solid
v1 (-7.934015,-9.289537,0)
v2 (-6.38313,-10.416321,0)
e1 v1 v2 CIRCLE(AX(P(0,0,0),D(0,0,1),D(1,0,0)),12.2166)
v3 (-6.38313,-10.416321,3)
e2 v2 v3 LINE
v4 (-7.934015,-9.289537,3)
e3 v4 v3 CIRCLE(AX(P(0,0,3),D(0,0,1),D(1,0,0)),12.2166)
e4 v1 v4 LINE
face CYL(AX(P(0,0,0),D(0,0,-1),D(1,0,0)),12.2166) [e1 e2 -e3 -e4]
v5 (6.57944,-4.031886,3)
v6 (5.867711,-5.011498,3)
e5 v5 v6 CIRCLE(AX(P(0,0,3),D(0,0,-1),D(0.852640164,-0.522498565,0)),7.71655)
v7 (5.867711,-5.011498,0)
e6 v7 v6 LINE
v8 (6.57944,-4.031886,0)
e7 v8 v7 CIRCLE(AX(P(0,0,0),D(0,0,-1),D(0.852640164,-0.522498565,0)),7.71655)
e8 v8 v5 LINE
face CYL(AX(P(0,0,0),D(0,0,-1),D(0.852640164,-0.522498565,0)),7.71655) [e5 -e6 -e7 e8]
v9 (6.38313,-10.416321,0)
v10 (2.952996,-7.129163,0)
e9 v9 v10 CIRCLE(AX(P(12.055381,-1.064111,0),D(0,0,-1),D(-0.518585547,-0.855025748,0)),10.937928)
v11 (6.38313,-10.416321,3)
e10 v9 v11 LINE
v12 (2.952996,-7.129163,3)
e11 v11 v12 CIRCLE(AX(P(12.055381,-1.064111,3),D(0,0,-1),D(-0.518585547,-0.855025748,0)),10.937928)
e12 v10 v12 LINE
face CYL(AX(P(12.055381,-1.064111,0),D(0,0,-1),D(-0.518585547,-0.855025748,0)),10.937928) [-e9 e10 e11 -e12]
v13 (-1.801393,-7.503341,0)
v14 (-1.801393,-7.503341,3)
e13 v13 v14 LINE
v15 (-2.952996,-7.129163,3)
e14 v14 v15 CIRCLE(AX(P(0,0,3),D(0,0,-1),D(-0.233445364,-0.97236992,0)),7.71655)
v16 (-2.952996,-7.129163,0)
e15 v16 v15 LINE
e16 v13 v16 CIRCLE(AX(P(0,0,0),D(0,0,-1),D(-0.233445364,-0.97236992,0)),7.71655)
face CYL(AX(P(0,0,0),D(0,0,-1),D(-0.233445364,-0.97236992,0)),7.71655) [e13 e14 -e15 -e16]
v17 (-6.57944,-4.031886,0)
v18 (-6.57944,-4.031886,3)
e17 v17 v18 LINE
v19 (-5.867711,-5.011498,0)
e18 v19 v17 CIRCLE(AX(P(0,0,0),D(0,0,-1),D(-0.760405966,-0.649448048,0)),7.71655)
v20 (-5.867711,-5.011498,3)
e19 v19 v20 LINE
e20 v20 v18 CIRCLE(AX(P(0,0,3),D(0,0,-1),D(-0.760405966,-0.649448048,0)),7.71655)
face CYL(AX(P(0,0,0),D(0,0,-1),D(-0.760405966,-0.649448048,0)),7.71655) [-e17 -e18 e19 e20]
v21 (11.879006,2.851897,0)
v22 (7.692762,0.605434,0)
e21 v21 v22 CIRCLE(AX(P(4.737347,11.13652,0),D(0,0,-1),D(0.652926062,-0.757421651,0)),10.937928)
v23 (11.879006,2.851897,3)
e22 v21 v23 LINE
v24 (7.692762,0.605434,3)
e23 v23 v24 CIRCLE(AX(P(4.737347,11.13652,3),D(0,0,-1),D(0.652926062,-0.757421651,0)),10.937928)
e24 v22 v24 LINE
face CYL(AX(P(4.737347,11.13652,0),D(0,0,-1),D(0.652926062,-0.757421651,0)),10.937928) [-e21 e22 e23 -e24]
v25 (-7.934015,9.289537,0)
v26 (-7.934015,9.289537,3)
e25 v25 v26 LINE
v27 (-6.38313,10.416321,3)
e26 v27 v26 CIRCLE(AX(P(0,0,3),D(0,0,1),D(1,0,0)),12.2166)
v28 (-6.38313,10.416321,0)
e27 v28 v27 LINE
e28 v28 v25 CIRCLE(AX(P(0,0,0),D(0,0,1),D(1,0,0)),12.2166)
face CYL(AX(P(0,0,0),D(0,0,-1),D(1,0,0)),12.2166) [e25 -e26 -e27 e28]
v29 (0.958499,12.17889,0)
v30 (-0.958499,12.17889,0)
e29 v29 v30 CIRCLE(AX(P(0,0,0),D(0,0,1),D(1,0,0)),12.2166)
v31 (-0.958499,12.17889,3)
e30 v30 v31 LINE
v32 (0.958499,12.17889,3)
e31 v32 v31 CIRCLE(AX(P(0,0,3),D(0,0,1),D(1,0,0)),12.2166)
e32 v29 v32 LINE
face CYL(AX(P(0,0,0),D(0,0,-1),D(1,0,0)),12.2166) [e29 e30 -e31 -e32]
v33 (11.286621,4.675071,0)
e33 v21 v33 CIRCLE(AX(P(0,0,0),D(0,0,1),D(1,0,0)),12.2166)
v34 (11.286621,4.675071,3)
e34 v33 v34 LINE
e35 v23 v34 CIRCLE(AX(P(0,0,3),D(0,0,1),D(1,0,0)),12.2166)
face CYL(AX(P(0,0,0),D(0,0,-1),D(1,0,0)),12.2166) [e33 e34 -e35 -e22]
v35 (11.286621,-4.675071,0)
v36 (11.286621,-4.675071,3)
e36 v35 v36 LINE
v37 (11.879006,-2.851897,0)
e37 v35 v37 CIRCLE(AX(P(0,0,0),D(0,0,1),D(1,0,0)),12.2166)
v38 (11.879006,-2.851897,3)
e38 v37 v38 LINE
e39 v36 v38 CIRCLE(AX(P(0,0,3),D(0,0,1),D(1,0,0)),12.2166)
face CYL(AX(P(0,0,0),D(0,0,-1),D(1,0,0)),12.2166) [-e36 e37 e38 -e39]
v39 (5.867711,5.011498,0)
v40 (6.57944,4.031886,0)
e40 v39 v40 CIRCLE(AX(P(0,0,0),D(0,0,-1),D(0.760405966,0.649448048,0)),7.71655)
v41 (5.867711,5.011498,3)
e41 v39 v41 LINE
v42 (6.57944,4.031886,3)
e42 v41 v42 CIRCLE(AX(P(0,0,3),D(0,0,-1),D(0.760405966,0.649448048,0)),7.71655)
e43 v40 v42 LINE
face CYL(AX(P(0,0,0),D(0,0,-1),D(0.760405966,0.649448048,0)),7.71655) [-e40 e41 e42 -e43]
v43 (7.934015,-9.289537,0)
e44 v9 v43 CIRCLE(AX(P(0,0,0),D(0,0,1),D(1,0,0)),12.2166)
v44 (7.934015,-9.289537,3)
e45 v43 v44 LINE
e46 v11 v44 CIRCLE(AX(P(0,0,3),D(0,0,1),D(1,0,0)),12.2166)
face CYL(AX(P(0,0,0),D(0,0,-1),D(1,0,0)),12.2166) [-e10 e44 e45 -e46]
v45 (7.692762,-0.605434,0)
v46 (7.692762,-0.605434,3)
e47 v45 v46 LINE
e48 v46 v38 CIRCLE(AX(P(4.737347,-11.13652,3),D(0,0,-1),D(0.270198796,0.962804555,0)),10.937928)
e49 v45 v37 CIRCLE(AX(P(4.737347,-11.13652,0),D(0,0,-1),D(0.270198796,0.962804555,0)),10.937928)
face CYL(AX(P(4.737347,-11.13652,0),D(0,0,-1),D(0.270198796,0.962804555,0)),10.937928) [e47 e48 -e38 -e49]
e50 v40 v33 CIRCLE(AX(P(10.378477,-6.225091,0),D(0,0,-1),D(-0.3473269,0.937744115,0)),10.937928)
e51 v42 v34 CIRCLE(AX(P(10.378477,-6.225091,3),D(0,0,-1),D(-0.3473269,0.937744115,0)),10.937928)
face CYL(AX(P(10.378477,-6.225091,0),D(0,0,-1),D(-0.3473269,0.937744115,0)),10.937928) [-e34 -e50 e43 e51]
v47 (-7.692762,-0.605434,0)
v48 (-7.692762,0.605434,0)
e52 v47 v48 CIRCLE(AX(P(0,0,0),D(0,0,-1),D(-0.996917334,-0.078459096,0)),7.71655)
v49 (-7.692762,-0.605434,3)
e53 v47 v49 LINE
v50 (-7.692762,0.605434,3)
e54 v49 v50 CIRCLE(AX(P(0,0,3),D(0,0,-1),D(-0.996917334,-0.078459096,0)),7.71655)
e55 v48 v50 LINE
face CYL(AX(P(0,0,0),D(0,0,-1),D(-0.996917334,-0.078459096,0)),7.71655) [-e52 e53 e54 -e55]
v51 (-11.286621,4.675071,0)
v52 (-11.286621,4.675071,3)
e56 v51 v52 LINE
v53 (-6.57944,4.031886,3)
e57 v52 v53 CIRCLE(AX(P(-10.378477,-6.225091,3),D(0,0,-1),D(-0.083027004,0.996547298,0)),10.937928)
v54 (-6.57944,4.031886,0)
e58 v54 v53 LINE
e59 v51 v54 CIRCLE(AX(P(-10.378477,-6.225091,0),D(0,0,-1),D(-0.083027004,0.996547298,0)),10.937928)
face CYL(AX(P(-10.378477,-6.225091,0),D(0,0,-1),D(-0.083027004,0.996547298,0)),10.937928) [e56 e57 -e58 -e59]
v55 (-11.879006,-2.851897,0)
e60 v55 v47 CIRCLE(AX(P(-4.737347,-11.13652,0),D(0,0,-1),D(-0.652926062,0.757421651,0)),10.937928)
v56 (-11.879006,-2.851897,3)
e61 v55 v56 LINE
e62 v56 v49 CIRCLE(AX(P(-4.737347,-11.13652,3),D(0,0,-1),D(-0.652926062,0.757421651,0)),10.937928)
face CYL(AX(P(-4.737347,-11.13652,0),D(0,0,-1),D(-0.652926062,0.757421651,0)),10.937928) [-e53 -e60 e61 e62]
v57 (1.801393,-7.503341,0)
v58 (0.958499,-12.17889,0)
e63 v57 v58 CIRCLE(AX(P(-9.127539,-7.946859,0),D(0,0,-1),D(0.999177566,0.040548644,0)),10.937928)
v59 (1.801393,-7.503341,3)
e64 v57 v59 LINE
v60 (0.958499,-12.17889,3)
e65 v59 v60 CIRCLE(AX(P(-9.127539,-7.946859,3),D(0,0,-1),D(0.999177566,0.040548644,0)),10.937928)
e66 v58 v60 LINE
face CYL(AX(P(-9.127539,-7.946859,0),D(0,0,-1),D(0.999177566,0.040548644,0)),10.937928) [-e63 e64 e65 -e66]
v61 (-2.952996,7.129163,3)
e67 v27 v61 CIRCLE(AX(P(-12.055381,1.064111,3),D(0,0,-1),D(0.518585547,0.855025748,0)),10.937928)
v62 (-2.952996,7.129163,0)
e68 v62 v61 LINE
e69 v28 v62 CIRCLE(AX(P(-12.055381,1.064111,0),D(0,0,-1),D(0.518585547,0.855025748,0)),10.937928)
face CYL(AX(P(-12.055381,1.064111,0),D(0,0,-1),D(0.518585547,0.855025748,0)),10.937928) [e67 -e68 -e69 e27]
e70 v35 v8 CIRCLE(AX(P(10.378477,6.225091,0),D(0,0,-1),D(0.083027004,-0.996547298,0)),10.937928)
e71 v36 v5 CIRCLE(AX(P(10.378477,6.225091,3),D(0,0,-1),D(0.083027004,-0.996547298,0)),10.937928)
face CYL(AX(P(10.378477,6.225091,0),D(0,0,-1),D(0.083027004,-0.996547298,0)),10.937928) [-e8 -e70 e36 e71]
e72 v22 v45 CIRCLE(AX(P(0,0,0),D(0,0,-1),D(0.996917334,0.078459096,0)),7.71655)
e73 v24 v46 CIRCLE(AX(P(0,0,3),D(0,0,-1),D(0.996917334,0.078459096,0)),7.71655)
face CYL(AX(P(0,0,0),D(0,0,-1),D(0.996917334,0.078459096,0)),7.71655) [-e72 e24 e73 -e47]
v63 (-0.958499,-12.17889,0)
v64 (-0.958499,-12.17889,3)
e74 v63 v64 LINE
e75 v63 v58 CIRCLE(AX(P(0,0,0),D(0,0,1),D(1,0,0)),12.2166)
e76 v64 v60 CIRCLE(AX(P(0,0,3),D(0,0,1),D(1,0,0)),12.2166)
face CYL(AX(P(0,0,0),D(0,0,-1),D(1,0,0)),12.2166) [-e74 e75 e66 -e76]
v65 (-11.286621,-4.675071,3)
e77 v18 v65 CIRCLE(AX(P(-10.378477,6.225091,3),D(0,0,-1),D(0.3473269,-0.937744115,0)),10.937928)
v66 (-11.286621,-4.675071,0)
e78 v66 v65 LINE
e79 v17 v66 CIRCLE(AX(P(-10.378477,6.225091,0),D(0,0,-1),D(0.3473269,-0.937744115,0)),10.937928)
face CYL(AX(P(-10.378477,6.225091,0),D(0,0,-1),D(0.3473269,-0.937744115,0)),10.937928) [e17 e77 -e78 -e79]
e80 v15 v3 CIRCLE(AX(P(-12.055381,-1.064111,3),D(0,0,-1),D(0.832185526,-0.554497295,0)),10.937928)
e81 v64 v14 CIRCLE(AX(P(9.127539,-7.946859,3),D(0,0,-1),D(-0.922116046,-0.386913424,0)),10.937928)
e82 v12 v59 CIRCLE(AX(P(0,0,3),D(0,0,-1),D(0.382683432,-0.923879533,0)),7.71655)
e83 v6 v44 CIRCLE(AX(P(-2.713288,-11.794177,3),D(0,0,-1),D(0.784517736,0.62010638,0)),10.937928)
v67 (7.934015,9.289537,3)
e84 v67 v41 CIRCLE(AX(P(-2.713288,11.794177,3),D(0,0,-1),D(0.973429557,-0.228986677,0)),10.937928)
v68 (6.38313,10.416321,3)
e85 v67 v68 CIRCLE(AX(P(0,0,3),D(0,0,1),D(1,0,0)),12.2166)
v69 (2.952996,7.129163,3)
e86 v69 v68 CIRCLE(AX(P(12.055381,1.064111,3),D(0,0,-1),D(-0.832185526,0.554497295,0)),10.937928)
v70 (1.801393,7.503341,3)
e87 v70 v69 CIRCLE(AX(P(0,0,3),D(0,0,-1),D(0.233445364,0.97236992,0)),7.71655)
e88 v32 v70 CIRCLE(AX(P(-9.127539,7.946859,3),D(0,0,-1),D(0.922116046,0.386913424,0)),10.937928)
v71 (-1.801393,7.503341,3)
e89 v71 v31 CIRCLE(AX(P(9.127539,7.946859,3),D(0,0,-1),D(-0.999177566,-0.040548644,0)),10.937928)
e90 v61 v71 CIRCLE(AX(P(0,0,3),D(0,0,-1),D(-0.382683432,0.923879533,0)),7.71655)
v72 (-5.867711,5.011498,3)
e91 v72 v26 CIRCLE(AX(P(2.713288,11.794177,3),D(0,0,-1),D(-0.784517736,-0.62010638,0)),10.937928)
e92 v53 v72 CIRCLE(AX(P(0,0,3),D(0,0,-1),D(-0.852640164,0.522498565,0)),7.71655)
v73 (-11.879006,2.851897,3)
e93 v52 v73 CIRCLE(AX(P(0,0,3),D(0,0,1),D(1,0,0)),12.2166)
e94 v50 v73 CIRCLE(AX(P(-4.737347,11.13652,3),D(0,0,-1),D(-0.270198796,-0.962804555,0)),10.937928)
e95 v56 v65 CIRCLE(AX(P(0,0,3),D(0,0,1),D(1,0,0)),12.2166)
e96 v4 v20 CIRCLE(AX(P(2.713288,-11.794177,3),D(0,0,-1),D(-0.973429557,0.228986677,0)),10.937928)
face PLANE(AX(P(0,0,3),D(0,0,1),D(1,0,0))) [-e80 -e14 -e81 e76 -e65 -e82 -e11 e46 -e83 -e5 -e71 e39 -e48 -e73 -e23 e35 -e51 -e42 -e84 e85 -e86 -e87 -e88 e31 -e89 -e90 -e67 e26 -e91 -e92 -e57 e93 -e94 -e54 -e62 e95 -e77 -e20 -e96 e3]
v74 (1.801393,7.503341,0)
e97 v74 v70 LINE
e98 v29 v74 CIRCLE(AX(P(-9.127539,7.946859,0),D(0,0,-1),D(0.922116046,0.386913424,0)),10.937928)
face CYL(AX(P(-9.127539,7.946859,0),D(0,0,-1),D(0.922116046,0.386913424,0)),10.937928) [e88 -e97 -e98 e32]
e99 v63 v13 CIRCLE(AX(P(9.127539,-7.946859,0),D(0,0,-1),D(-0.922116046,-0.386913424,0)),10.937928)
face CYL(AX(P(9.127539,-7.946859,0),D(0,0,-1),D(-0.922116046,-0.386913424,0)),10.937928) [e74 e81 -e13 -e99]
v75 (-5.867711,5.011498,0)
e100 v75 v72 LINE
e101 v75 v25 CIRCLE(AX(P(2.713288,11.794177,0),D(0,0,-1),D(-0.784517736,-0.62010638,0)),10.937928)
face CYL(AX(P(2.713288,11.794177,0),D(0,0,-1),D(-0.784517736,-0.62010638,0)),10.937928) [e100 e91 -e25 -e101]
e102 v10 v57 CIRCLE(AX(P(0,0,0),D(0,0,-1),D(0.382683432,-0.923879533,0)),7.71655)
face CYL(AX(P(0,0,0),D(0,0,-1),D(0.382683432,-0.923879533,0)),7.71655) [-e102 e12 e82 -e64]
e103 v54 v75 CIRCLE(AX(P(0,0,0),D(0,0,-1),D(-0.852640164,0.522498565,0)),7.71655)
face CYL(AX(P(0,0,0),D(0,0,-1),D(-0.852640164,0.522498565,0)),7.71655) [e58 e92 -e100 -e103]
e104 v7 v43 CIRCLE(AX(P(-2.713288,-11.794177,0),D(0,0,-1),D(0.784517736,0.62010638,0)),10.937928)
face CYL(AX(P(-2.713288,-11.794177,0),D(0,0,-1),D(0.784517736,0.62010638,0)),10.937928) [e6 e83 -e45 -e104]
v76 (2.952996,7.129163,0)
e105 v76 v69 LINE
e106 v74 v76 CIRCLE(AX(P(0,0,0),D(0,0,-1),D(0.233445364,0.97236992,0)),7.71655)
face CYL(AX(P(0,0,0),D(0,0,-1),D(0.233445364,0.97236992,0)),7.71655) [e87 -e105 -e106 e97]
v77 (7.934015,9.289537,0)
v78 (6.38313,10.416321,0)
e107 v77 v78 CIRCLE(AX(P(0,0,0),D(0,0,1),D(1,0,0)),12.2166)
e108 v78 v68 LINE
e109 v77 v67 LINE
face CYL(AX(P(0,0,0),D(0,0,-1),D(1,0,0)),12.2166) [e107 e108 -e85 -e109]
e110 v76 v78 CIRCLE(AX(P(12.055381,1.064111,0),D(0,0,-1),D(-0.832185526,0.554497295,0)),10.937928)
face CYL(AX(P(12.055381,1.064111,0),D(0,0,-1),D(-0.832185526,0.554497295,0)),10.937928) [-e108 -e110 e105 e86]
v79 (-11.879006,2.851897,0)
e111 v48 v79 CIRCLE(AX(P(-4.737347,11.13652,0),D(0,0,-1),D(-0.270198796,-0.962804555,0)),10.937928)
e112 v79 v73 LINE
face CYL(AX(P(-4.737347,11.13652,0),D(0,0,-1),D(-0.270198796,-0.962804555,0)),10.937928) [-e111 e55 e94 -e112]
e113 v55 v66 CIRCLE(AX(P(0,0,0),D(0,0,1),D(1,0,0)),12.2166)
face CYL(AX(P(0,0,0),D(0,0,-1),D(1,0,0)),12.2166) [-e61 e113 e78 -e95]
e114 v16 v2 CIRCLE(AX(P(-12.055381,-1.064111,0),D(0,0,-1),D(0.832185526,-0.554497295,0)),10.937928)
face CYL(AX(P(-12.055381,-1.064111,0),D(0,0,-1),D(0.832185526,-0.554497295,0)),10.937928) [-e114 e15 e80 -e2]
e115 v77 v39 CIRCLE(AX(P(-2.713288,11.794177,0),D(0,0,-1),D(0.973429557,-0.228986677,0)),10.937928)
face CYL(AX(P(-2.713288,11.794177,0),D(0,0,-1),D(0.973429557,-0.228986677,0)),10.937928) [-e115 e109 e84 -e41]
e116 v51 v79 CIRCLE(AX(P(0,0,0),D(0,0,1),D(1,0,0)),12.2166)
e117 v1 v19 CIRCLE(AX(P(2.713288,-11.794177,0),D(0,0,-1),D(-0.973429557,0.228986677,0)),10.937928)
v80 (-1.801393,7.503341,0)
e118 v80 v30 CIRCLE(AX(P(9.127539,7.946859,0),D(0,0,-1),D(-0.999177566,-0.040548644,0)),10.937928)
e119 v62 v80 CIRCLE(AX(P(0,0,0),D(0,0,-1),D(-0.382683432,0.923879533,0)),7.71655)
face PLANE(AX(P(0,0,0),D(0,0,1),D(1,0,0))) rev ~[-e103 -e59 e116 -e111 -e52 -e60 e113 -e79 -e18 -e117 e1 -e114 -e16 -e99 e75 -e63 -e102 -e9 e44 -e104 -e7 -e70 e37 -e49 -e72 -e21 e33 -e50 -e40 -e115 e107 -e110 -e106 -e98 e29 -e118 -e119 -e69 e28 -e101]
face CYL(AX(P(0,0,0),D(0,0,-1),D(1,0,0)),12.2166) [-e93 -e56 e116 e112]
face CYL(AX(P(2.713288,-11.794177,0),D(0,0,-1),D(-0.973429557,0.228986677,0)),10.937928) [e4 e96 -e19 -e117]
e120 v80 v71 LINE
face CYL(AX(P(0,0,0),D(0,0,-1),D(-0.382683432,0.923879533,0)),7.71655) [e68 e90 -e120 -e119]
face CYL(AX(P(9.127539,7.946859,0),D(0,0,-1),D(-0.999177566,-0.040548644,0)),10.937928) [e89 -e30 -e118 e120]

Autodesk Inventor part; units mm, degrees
sketch "Sketch1" plane through (0, 0, 0) normal (0, 0, 1) x (1, 0, 0)
  circle A0 centre (0, 0) radius 12.2166
  dimension "d0" = 24.4331
extrude "Extrusion1" add sketch "Sketch1" along normal blind 3
ref_plane "Work Plane2" through (0, 0, 1.5) normal (0, 0, 1) x (1, 0, 0)
sketch "Sketch2" plane through (0, 0, 0) normal (0, 0, -1) x (-1, 0, 0)
  circle A0 centre (0, 0) radius 12.2166 projected
  circle A1 centre (0, 0) radius 10
  dimension "d3" = 20
surface extrude "Средний диаметр" sketch "Sketch2" against normal through all shown no curves A1
ref_plane "Work Plane8" through (0, 0, 0) normal (0.9510565, 0.309017, 0) x (0, 0, 1)
ref_plane "Work Plane9" through (0, 0, 0) normal (1, 0, 0) x (0, 1, 0)
spur gear teeth "Цилиндрическое зубчатое зацепление" teeth 10 pitch diameter 20 tip diameter 24.4331 root diameter 15.4331 face width 3 start plane through (0, 0, 0) normal (0, 0, -1) x (-1, 0, 0)
equation "\"d0\" = da_da"
equation "\"d1\" = da_b"
equation "\"d3\" = da_d"
equation "\"da_da\" = 24.433119"
equation "\"da_b\" = 3"
equation "\"da_d\" = 20"
properties part number "Цилиндрическое зубчатое зацепление1" material "Steel"
